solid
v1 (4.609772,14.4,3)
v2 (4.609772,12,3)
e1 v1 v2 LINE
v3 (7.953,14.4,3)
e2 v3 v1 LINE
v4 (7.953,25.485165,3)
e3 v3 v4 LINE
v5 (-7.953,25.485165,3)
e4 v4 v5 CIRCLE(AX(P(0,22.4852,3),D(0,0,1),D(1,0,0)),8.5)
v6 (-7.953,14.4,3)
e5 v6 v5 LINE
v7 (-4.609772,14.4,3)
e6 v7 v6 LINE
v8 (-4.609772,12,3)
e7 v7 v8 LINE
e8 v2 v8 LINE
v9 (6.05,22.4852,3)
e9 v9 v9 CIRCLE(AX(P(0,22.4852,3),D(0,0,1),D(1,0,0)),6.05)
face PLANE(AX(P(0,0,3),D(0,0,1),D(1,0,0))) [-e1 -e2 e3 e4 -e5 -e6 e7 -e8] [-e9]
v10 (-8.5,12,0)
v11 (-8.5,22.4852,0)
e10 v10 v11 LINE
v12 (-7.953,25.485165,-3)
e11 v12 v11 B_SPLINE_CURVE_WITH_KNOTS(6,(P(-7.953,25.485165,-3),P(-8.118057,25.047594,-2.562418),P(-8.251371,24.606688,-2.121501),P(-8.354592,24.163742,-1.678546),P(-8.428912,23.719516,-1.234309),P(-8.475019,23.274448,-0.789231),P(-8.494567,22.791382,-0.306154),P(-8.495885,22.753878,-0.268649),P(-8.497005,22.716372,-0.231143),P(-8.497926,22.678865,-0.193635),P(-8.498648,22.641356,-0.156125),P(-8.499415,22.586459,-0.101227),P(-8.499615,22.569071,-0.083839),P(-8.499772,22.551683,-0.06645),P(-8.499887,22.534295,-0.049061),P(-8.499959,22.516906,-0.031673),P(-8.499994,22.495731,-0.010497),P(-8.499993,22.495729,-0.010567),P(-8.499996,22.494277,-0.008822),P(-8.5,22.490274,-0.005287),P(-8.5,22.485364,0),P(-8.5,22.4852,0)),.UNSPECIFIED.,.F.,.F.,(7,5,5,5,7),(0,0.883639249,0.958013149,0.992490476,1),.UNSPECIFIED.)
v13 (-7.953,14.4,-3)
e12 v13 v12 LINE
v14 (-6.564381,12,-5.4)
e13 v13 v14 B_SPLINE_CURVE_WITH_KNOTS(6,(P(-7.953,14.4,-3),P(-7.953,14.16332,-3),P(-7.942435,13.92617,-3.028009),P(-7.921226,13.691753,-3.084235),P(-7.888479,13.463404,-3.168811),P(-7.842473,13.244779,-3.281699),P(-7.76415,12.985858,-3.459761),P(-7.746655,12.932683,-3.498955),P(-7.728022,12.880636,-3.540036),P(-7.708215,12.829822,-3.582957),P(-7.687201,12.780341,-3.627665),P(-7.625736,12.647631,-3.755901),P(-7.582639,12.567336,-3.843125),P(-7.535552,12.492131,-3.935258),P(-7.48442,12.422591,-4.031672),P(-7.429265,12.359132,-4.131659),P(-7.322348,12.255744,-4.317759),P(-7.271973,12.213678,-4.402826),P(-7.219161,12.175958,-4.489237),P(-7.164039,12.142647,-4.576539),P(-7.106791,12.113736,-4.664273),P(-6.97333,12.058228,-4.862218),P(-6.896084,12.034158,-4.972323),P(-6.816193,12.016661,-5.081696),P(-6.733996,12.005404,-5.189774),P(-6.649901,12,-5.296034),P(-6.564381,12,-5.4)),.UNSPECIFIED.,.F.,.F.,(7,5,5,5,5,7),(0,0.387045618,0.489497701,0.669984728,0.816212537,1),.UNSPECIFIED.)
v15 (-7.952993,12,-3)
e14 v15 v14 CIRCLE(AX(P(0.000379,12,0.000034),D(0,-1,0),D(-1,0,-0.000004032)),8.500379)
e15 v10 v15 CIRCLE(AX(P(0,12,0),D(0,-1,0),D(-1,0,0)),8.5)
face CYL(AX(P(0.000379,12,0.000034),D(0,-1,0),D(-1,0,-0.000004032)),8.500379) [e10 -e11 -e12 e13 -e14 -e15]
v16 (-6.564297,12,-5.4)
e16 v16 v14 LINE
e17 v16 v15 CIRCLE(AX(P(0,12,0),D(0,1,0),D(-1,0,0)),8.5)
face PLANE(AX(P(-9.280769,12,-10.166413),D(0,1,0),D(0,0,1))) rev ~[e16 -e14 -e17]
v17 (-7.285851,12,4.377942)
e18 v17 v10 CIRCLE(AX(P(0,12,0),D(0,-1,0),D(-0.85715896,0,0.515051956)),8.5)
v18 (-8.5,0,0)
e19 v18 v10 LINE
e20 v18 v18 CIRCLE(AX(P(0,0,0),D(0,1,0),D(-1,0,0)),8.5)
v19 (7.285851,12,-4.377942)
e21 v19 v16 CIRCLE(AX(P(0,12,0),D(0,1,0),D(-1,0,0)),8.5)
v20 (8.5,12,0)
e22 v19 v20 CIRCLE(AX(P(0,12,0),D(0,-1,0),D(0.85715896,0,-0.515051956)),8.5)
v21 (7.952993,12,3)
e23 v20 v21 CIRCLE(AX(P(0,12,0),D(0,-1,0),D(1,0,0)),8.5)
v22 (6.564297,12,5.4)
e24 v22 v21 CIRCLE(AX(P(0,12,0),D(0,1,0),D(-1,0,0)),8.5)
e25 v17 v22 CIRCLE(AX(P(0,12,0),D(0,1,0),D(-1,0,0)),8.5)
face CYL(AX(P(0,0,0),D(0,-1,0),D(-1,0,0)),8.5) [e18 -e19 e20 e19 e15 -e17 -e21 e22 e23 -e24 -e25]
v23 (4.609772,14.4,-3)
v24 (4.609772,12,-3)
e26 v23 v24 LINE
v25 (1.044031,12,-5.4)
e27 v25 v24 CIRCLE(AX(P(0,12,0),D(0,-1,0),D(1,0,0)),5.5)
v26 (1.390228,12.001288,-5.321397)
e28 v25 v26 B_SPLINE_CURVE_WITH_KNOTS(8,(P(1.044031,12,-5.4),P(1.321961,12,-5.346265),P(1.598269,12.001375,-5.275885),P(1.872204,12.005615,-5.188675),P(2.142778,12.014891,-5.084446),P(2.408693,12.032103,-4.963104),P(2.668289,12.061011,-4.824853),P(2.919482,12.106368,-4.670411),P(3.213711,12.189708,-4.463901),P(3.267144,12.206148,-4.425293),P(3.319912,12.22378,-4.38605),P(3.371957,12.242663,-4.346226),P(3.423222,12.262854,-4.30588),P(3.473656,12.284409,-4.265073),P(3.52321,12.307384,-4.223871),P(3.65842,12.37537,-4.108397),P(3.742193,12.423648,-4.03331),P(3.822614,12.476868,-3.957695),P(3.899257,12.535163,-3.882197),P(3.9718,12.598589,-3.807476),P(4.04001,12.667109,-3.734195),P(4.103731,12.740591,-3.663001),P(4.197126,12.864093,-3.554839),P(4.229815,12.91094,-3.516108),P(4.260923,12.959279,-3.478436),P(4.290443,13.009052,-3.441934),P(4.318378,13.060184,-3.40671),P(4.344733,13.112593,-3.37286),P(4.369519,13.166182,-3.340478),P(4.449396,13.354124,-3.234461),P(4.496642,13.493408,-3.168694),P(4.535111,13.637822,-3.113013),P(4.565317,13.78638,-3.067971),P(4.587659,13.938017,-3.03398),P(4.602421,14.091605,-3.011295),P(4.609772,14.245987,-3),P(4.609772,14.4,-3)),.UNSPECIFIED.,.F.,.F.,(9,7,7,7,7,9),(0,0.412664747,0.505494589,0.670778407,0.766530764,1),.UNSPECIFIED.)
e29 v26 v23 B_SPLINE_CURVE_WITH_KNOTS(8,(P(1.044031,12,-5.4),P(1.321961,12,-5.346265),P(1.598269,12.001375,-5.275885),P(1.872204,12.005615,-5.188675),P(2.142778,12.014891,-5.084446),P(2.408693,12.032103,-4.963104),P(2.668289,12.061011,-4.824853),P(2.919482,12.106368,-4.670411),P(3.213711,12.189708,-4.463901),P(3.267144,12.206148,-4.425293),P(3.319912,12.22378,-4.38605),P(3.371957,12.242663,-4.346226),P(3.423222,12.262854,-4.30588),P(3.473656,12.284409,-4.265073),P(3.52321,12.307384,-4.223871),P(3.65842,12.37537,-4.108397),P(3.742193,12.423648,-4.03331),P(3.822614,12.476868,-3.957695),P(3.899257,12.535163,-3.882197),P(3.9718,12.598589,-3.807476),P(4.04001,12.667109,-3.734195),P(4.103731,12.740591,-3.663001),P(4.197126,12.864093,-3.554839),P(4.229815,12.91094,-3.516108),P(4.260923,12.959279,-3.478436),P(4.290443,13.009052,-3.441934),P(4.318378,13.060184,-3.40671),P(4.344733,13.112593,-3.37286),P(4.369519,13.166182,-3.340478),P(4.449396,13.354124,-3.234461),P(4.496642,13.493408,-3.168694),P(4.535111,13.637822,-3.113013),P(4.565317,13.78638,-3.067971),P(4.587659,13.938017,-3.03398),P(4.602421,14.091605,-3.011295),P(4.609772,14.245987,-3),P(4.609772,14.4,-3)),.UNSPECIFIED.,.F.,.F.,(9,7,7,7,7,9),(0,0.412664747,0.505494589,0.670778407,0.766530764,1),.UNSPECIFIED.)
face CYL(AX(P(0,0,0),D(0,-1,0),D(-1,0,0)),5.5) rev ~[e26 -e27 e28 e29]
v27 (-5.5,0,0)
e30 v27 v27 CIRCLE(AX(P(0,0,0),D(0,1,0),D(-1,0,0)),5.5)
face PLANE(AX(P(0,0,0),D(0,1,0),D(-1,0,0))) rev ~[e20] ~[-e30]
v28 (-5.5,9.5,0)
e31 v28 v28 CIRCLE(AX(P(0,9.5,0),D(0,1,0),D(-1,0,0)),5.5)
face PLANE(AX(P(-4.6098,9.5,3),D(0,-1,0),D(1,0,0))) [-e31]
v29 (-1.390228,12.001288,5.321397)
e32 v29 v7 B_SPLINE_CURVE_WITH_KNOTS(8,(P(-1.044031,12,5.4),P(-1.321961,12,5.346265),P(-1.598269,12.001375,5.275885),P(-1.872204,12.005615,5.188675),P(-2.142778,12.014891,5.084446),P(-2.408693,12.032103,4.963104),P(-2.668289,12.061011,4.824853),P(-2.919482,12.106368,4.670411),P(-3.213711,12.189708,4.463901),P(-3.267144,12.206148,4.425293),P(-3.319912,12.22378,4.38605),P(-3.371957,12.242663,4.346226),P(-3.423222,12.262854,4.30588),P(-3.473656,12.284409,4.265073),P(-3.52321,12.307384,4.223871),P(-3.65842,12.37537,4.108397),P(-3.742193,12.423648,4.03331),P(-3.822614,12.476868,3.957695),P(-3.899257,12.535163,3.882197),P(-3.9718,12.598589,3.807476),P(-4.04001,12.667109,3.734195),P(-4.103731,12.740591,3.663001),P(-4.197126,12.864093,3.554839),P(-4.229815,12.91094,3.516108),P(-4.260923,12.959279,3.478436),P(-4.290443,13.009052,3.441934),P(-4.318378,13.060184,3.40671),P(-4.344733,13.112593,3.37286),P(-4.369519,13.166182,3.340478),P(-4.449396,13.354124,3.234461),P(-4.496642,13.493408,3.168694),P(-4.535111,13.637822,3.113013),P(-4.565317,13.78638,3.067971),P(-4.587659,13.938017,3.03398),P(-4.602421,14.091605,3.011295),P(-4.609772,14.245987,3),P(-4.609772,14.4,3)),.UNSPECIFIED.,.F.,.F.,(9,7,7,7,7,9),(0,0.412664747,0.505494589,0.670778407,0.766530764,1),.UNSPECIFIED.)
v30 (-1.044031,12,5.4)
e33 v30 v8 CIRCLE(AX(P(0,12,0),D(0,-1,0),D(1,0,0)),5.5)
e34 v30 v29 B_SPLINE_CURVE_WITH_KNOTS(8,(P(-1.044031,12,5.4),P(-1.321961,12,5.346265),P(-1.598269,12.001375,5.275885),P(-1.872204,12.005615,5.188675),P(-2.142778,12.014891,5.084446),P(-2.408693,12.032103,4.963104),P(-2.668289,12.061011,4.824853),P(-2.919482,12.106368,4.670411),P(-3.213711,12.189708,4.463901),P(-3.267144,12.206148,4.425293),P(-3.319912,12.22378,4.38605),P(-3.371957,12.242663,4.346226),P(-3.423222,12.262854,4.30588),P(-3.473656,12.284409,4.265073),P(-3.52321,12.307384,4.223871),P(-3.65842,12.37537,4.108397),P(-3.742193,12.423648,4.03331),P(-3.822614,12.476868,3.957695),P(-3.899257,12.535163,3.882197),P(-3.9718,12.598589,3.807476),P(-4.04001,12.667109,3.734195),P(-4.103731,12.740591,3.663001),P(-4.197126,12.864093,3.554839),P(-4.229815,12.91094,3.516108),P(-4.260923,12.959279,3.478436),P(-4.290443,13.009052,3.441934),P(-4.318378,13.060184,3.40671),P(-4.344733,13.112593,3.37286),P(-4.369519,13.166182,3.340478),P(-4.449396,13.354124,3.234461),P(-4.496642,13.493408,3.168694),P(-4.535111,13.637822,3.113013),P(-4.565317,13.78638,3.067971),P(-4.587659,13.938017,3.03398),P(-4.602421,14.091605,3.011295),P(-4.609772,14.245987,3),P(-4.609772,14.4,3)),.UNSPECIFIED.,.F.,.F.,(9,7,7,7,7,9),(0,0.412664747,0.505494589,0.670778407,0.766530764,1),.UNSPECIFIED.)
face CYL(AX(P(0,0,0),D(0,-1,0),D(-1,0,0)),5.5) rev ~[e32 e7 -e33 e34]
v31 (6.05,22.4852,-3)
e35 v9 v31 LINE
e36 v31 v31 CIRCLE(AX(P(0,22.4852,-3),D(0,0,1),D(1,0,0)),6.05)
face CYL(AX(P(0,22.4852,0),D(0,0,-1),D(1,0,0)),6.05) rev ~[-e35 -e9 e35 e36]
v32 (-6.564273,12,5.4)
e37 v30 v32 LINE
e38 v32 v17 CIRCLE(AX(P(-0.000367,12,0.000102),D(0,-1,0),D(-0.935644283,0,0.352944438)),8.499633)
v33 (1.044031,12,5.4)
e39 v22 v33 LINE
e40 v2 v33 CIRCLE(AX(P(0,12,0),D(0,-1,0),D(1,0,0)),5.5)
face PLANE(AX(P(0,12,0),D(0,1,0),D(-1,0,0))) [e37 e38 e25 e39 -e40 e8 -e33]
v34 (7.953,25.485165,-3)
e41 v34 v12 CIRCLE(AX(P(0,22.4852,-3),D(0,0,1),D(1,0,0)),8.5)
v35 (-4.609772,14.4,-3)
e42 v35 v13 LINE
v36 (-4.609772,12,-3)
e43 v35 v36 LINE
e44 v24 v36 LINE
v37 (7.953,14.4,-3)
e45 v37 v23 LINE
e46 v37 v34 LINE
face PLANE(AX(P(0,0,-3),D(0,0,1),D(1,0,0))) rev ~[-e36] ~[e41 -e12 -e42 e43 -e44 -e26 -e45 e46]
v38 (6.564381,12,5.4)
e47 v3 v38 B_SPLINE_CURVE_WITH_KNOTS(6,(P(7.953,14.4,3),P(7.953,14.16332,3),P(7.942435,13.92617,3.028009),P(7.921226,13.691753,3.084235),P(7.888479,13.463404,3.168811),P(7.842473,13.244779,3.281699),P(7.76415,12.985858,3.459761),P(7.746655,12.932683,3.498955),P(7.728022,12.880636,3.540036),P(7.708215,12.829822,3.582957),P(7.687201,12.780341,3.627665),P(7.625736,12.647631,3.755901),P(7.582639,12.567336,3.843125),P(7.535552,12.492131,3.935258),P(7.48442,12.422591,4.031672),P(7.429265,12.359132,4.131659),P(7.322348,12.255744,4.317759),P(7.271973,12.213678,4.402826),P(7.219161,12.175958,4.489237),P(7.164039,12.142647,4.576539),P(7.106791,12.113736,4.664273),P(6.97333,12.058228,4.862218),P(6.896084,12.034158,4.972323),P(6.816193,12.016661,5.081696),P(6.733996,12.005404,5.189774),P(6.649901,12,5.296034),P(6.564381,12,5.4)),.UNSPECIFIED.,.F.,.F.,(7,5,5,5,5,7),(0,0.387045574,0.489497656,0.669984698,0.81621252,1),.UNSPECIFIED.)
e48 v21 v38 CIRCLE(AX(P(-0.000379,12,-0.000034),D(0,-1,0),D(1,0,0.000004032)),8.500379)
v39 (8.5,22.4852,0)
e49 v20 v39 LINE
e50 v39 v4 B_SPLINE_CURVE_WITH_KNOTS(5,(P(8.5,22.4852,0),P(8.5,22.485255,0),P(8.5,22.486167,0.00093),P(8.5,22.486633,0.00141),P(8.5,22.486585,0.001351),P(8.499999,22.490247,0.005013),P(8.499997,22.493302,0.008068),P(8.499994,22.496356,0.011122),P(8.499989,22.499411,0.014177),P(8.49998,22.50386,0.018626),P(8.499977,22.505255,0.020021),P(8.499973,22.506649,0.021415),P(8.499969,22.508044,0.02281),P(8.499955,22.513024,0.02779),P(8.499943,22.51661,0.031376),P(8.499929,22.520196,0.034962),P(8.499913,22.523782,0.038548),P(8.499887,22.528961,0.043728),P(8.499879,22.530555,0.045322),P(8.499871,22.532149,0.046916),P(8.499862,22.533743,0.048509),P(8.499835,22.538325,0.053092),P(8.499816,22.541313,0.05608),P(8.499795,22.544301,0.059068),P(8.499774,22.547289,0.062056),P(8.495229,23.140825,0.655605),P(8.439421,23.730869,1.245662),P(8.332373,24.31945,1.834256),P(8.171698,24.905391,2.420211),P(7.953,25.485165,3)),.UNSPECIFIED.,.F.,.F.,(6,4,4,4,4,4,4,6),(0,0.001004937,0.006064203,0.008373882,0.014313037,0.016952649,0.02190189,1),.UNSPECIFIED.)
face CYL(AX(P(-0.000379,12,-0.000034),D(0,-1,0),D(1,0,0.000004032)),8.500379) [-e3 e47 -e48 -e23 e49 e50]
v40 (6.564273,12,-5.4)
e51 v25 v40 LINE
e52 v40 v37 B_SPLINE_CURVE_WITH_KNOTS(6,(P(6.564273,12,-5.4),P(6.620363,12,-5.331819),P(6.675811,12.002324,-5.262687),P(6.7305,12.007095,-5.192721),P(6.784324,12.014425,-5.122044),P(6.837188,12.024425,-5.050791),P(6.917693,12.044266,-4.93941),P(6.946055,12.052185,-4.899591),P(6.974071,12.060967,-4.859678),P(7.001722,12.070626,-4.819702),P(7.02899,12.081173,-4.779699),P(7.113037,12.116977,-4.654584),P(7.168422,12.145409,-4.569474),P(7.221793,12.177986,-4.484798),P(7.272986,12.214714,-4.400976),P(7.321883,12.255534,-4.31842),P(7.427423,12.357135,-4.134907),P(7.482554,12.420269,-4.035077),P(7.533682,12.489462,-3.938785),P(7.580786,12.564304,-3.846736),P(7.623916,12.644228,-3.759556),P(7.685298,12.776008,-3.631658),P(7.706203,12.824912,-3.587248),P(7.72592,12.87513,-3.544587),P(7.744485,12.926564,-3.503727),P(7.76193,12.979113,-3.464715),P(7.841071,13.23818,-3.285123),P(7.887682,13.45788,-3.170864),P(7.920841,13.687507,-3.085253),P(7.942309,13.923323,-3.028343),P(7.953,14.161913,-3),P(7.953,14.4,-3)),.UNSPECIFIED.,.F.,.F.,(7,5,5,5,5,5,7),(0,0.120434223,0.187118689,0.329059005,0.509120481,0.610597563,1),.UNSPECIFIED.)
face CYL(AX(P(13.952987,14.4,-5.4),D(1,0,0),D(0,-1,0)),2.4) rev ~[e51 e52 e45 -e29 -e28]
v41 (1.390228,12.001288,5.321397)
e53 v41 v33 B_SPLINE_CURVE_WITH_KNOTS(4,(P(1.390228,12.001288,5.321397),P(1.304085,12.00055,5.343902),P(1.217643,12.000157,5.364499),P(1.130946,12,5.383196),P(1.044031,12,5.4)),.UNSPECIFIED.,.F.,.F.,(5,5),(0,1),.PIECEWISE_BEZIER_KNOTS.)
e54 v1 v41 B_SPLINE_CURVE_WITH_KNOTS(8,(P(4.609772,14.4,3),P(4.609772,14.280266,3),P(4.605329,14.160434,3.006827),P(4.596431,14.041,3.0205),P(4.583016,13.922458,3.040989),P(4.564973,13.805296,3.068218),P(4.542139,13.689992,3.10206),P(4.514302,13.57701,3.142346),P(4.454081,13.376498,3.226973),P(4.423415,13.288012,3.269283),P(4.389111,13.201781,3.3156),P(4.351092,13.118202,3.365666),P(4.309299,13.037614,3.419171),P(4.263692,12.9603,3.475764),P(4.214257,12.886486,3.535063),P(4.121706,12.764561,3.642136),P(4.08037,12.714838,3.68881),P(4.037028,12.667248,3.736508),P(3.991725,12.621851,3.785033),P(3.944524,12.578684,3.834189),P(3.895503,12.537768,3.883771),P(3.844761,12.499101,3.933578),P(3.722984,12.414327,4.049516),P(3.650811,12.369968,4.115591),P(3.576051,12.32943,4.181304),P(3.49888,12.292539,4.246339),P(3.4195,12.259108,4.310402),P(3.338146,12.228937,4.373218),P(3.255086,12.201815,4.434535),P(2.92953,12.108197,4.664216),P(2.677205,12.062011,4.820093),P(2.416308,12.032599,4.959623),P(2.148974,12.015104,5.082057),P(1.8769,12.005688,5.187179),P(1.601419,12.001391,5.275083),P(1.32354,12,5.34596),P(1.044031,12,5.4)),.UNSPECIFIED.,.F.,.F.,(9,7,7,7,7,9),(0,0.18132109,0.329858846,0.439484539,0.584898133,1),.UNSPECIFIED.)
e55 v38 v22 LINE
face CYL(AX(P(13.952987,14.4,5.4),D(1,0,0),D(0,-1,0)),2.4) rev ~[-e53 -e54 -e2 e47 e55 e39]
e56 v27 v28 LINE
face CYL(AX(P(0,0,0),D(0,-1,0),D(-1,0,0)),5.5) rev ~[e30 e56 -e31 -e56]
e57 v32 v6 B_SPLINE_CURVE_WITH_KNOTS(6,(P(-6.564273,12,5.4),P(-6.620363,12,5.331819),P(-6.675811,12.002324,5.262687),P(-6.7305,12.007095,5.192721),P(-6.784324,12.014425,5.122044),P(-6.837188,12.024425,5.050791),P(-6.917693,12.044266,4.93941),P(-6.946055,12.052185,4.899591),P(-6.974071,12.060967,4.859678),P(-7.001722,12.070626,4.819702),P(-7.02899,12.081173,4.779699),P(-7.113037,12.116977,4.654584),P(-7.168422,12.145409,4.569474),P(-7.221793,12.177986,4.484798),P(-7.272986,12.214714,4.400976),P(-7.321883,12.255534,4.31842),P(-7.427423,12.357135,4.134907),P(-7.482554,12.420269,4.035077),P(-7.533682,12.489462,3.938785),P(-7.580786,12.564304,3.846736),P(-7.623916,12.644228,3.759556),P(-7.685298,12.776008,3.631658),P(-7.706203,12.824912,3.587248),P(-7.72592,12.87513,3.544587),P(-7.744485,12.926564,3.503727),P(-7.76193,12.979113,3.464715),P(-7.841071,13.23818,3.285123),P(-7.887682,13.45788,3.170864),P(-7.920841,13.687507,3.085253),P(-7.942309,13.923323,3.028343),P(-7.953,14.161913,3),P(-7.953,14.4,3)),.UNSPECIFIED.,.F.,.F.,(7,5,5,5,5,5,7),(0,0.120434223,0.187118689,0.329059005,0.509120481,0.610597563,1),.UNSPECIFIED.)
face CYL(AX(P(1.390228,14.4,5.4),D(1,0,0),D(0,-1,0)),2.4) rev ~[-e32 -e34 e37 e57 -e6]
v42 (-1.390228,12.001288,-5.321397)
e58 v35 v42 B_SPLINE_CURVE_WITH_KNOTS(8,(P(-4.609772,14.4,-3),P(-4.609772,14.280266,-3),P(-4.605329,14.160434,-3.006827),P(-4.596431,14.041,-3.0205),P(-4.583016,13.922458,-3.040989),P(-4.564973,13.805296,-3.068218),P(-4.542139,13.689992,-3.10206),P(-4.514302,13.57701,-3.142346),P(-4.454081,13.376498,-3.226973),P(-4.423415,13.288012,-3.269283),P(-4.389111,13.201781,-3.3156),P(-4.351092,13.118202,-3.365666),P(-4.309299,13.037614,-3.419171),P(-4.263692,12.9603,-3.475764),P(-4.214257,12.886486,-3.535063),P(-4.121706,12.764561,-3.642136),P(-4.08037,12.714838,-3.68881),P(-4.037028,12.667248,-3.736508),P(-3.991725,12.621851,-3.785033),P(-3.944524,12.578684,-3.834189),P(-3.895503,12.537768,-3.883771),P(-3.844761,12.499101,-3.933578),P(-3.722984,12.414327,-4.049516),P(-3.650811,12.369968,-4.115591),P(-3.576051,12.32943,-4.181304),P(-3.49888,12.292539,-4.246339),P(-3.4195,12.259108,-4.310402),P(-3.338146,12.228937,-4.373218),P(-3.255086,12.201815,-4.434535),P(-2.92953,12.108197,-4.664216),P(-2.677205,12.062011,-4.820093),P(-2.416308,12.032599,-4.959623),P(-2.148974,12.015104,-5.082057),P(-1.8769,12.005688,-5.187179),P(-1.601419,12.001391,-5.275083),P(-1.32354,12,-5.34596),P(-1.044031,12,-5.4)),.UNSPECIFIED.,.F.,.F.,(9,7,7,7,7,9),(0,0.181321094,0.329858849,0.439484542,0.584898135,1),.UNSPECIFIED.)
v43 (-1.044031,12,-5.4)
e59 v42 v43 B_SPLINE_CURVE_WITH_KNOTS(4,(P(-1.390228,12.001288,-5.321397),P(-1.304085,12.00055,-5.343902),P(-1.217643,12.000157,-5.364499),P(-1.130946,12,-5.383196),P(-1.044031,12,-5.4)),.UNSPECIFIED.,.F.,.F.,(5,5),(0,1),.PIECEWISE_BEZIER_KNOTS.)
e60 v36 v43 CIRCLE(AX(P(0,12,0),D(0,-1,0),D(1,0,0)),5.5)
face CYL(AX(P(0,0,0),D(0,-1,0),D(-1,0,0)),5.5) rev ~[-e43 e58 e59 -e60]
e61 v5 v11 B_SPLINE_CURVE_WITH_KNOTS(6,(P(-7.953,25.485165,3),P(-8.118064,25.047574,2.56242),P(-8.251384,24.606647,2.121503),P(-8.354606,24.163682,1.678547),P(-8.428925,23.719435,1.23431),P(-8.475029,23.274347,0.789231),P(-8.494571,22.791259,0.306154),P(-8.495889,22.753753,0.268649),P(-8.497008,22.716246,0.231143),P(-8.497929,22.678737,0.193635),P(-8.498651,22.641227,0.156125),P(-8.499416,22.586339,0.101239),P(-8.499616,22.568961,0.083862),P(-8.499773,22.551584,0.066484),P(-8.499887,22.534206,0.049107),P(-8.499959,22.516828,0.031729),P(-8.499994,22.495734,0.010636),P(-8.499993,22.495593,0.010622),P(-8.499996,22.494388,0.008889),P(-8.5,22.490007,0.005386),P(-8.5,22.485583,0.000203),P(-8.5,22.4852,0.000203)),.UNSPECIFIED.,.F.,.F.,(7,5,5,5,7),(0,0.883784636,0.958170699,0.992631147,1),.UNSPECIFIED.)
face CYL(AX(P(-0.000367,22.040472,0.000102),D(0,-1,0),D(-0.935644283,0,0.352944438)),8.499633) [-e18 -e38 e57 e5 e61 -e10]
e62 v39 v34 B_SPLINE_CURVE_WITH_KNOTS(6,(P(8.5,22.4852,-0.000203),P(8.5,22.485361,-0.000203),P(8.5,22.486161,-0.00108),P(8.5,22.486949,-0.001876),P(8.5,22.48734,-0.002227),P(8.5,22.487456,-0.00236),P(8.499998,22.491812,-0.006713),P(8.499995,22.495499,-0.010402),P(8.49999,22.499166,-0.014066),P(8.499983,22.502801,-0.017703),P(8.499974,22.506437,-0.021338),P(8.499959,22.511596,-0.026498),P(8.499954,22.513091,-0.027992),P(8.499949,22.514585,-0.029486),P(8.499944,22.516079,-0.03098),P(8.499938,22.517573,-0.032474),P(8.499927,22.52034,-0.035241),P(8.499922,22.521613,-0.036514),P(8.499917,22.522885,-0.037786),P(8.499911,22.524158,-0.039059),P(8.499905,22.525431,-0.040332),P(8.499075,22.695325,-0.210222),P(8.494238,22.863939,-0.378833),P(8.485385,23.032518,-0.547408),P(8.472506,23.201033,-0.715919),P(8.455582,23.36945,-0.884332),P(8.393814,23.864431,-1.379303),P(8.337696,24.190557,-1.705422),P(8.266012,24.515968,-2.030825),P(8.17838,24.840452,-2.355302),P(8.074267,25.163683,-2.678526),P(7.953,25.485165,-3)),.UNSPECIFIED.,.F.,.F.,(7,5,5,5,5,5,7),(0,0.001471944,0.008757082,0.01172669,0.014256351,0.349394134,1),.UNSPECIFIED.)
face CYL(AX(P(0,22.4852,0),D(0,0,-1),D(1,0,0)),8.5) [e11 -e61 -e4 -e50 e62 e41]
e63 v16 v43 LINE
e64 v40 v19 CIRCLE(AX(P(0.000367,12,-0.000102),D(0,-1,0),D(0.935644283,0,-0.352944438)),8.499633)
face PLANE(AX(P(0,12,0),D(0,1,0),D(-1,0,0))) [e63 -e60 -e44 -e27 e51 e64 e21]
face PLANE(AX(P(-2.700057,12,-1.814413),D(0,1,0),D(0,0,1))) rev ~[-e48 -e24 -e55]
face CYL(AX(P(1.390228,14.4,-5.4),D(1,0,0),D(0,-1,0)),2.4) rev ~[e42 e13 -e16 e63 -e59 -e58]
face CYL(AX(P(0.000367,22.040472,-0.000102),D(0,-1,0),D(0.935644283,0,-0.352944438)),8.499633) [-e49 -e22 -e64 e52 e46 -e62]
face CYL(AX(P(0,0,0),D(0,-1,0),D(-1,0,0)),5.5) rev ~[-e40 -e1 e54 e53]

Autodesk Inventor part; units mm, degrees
ref_plane "YZ Plane" through (0, 0, 0) normal (1, 0, 0) x (0, 1, 0)
ref_plane "XZ Plane" through (0, 0, 0) normal (0, 1, 0) x (-1, 0, 0)
ref_plane "XY Plane" through (0, 0, 0) normal (0, 0, 1) x (1, 0, 0)
sketch "Sketch1" plane through (0, 0, 0) normal (0, 1, 0) x (-1, 0, 0)
  circle A0 centre (0, 0) radius 8.5
  circle A1 centre (0, 0) radius 5.5
  dimension "d0" = 17
  dimension "d1" = 11
extrude "Extrusion1" add sketch "Sketch1" along normal blind 12
sketch "Sketch3" plane through (0, 0, 0) normal (0, 0, 1) x (1, 0, 0)
  line L0 (8.5, 12) -> (-8.5, 12) projected
  line L1 (8.5, 0) -> (-8.5, 0) projected
  circle A0 centre (0, 22.4852) radius 8.5
  line L2 (-8.5, 22.4852) -> (-8.5, 12)
  line L3 (8.5, 22.4852) -> (8.5, 12)
  circle A1 centre (0, 22.4852) radius 6.05
  point P0 (0, 0)
  dimension "d4" = 17
  dimension "d5" = 12.1
extrude "Extrusion2" add sketch "Sketch3" along normal mid plane 6
sketch "Sketch4" plane through (-4.6098, 12, 3) normal (0, -1, 0) x (1, 0, 0)
  circle A0 centre (4.6098, -3) radius 5.5 projected
  arc A1 (13.1098, -3) -> (12.5628, 0) centre (4.6098, -3) ccw projected
  line L0 (13.1098, -3) -> (13.1098, 0) projected
  line L1 (12.5628, 0) -> (13.1098, 0) projected
  arc A2 (12.5628, -6) -> (13.1098, -3) centre (4.6098, -3) ccw projected
  line L2 (13.1098, -6) -> (12.5628, -6) projected
  line L3 (13.1098, -6) -> (13.1098, -3) projected
  arc A3 (-3.3432, 0) -> (-3.8902, -3) centre (4.6098, -3) ccw projected
  line L4 (-3.8902, 0) -> (-3.3432, 0) projected
  line L5 (-3.8902, -3) -> (-3.8902, 0) projected
  arc A4 (-3.8902, -3) -> (-3.3432, -6) centre (4.6098, -3) ccw projected
  line L6 (-3.8902, -6) -> (-3.8902, -3) projected
  line L7 (-3.3432, -6) -> (-3.8902, -6) projected
  point P0 (-3.8902, -3)
  point P1 (-3.8902, -3)
  point P2 (-3.8902, -3)
  point P3 (-3.8902, -3)
extrude "Extrusion4" cut sketch "Sketch4" against normal blind 37.425 contours A1 L1 L0 | L3 L2 A2 | A4 L7 L6 | A3 L5 L4
fillet "Fillet1" radius 2.4 4 edges at (6.2814, 12, -3) (-6.2814, 12, -3) (-6.2814, 12, 3) (6.2814, 12, 3)
extrude "Extrusion5" add sketch "Sketch4" along normal blind 2.5 contours A0
properties part number "Clip"
